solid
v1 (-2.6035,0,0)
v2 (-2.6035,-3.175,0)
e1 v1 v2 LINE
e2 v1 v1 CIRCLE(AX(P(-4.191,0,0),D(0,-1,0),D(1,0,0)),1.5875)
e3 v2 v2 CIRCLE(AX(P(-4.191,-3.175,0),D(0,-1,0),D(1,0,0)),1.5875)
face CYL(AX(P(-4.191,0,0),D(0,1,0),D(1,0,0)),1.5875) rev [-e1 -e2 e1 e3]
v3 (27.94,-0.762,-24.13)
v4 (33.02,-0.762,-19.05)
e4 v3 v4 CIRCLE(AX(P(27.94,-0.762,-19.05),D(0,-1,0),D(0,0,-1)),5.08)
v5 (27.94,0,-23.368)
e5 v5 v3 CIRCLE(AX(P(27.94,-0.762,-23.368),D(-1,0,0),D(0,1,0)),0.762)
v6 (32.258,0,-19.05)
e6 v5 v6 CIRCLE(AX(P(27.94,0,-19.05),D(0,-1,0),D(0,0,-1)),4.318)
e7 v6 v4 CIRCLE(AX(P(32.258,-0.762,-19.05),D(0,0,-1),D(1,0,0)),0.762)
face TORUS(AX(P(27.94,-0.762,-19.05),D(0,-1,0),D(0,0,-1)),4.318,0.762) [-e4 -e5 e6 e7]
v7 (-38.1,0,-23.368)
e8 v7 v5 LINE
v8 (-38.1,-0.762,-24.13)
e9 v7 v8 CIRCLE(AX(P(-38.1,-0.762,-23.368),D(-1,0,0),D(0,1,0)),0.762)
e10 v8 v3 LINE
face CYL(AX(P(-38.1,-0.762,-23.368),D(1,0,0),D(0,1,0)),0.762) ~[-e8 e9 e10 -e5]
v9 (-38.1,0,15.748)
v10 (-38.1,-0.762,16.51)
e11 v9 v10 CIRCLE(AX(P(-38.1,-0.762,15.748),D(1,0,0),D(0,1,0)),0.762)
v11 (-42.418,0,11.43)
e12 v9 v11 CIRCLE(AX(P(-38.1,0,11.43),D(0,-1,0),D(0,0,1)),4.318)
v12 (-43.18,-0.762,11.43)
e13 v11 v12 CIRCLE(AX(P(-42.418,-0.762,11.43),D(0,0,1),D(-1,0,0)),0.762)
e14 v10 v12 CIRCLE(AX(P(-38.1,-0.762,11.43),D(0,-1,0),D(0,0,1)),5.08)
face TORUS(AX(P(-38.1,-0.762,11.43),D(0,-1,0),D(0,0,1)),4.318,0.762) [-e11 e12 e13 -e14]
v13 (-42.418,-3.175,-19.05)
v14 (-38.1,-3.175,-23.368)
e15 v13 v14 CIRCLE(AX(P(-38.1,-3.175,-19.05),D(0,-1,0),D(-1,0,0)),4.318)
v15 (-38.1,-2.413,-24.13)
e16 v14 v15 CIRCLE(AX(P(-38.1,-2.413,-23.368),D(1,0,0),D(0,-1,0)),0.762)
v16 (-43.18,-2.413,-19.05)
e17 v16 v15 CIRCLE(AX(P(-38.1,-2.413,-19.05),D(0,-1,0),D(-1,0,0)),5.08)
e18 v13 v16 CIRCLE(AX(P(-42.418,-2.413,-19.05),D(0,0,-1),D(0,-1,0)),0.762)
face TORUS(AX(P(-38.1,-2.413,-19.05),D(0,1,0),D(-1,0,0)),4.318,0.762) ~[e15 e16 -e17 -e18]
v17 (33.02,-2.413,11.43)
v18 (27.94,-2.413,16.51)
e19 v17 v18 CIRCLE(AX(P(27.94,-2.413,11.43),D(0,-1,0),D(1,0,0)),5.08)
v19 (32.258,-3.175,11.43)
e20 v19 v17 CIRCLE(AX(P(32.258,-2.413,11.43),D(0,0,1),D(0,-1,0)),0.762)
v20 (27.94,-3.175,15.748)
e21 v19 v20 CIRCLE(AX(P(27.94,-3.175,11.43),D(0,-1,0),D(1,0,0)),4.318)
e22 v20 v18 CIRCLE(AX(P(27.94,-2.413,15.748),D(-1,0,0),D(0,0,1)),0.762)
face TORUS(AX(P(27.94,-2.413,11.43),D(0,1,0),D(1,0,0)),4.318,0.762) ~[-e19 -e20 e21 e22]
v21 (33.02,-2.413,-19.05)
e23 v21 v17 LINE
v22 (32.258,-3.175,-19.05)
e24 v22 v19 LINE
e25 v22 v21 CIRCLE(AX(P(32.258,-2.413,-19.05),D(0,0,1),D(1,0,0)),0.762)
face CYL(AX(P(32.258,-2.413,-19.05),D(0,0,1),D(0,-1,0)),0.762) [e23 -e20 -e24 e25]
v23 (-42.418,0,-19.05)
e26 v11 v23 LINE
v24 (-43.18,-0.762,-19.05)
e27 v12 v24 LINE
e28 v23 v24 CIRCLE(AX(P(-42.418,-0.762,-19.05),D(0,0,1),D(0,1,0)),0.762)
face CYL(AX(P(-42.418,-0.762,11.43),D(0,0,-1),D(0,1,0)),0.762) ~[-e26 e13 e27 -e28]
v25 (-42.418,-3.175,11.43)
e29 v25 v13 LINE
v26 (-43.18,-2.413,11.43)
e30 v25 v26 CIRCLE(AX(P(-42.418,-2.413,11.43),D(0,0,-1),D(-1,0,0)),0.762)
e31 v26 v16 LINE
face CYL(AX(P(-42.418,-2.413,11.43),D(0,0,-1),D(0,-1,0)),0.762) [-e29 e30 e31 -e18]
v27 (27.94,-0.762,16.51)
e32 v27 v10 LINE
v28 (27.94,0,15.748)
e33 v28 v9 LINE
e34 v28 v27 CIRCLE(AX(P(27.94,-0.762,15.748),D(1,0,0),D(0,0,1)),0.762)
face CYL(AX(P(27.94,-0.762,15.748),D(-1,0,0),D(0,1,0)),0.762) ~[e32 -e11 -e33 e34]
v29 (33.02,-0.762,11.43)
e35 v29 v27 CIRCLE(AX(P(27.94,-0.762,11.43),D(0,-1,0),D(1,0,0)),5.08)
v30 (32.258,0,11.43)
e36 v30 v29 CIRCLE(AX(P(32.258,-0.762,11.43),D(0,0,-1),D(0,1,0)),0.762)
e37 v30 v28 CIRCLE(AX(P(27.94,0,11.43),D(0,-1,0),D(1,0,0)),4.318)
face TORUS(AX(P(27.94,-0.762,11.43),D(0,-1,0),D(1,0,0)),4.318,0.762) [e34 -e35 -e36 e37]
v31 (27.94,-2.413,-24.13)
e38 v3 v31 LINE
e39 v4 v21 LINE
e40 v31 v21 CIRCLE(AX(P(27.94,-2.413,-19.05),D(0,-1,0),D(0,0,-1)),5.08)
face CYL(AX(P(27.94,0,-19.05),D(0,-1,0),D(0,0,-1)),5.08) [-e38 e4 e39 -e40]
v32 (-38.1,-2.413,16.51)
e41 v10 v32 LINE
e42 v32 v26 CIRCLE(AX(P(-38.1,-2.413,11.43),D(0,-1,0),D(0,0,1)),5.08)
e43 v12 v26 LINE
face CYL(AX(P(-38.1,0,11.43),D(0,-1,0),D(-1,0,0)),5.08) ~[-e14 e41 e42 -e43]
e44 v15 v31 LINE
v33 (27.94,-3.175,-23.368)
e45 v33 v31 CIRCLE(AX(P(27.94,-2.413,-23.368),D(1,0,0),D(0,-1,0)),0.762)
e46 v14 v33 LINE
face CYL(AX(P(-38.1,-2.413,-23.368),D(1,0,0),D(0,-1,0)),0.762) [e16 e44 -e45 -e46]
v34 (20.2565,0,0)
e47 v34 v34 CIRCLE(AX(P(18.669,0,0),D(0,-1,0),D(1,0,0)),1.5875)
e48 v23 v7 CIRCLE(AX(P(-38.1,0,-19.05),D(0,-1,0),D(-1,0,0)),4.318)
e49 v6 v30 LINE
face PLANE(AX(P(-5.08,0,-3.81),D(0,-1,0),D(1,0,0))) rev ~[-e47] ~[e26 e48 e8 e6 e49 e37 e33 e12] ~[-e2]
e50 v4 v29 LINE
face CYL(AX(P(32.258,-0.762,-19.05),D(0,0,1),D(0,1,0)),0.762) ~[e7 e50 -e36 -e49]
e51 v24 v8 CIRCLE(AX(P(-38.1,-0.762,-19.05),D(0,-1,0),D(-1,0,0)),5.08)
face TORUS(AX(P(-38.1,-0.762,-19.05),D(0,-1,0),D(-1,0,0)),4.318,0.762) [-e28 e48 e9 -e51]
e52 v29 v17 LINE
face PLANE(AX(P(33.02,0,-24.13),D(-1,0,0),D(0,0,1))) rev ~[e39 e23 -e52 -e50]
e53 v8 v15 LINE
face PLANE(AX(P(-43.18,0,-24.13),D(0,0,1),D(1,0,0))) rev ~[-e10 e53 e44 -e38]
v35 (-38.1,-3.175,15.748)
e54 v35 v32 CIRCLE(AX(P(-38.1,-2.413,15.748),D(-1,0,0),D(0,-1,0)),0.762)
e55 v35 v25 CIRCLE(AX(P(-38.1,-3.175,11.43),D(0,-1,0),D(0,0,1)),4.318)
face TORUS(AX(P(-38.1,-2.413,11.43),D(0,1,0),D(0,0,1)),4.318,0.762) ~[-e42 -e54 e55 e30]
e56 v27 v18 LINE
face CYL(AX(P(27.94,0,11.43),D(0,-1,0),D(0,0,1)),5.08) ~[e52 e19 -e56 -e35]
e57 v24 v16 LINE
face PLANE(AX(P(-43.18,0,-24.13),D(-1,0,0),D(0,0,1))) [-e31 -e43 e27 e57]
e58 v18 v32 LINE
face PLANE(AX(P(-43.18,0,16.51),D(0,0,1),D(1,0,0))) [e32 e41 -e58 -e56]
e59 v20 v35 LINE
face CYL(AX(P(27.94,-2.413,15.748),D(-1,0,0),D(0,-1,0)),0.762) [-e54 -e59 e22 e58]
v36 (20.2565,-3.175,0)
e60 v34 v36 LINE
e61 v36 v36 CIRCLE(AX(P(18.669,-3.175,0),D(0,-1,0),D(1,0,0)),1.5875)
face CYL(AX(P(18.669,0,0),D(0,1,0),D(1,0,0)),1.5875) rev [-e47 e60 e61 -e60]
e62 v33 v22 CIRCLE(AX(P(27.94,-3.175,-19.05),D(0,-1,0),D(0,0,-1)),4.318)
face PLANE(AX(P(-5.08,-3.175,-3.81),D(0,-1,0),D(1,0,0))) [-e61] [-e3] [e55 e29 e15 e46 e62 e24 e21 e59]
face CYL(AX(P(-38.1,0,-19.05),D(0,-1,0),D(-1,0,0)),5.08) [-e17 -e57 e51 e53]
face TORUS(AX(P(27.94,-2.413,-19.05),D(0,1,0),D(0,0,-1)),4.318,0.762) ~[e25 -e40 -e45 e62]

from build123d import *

# Parameters (mm, degrees)
F0_W     = 76.2
F0_H     = 40.64
F0_R     = 1.5875
F1_DEPTH = 3.175
F2_R     = 5.08
F3_R     = 0.762


# Not quite as in the source:
# - a feature names something its author has since deleted; it is built from what else it names


with BuildPart() as f1:
    # F0 (on Front) → F1 (new body)
    with BuildSketch(Plane.XZ):
        with Locations((-5.08, -3.81)):
            Rectangle(F0_W, F0_H)
        with Locations((-4.191, 0)):
            Circle(F0_R, mode=Mode.SUBTRACT)
        with Locations((18.669, 0)):
            Circle(F0_R, mode=Mode.SUBTRACT)
    extrude(amount=F1_DEPTH)

    # F2
    f2_edges = [f1.edges().sort_by_distance(p)[0] for p in [
        (-43.18, -1.5875, -24.13),
        (33.02, -1.5875, 16.51),
        (33.02, -1.5875, -24.13),
        (-43.18, -1.5875, 16.51),
    ]]
    fillet(f2_edges, radius=F2_R)

    # F3
    f3_edges = [f1.edges().sort_by_distance(p)[0] for p in [
        (-5.08, 0, -24.13),
        (-5.08, -3.175, -24.13),
        (-43.18, -3.175, -3.81),
        (-43.18, 0, -3.81),
        (-41.692102, 0, -22.642102),
        (31.532102, 0, -22.642102),
        (33.02, 0, -3.81),
        (-41.692102, 0, 15.022102),
        (31.532102, 0, 15.022102),
        (-5.08, 0, 16.51),
        (-41.692102, -3.175, -22.642102),
        (31.532102, -3.175, -22.642102),
        (33.02, -3.175, -3.81),
        (-41.692102, -3.175, 15.022102),
        (31.532102, -3.175, 15.022102),
        (-5.08, -3.175, 16.51),
    ]]
    fillet(f3_edges, radius=F3_R)


solid = f1.part
